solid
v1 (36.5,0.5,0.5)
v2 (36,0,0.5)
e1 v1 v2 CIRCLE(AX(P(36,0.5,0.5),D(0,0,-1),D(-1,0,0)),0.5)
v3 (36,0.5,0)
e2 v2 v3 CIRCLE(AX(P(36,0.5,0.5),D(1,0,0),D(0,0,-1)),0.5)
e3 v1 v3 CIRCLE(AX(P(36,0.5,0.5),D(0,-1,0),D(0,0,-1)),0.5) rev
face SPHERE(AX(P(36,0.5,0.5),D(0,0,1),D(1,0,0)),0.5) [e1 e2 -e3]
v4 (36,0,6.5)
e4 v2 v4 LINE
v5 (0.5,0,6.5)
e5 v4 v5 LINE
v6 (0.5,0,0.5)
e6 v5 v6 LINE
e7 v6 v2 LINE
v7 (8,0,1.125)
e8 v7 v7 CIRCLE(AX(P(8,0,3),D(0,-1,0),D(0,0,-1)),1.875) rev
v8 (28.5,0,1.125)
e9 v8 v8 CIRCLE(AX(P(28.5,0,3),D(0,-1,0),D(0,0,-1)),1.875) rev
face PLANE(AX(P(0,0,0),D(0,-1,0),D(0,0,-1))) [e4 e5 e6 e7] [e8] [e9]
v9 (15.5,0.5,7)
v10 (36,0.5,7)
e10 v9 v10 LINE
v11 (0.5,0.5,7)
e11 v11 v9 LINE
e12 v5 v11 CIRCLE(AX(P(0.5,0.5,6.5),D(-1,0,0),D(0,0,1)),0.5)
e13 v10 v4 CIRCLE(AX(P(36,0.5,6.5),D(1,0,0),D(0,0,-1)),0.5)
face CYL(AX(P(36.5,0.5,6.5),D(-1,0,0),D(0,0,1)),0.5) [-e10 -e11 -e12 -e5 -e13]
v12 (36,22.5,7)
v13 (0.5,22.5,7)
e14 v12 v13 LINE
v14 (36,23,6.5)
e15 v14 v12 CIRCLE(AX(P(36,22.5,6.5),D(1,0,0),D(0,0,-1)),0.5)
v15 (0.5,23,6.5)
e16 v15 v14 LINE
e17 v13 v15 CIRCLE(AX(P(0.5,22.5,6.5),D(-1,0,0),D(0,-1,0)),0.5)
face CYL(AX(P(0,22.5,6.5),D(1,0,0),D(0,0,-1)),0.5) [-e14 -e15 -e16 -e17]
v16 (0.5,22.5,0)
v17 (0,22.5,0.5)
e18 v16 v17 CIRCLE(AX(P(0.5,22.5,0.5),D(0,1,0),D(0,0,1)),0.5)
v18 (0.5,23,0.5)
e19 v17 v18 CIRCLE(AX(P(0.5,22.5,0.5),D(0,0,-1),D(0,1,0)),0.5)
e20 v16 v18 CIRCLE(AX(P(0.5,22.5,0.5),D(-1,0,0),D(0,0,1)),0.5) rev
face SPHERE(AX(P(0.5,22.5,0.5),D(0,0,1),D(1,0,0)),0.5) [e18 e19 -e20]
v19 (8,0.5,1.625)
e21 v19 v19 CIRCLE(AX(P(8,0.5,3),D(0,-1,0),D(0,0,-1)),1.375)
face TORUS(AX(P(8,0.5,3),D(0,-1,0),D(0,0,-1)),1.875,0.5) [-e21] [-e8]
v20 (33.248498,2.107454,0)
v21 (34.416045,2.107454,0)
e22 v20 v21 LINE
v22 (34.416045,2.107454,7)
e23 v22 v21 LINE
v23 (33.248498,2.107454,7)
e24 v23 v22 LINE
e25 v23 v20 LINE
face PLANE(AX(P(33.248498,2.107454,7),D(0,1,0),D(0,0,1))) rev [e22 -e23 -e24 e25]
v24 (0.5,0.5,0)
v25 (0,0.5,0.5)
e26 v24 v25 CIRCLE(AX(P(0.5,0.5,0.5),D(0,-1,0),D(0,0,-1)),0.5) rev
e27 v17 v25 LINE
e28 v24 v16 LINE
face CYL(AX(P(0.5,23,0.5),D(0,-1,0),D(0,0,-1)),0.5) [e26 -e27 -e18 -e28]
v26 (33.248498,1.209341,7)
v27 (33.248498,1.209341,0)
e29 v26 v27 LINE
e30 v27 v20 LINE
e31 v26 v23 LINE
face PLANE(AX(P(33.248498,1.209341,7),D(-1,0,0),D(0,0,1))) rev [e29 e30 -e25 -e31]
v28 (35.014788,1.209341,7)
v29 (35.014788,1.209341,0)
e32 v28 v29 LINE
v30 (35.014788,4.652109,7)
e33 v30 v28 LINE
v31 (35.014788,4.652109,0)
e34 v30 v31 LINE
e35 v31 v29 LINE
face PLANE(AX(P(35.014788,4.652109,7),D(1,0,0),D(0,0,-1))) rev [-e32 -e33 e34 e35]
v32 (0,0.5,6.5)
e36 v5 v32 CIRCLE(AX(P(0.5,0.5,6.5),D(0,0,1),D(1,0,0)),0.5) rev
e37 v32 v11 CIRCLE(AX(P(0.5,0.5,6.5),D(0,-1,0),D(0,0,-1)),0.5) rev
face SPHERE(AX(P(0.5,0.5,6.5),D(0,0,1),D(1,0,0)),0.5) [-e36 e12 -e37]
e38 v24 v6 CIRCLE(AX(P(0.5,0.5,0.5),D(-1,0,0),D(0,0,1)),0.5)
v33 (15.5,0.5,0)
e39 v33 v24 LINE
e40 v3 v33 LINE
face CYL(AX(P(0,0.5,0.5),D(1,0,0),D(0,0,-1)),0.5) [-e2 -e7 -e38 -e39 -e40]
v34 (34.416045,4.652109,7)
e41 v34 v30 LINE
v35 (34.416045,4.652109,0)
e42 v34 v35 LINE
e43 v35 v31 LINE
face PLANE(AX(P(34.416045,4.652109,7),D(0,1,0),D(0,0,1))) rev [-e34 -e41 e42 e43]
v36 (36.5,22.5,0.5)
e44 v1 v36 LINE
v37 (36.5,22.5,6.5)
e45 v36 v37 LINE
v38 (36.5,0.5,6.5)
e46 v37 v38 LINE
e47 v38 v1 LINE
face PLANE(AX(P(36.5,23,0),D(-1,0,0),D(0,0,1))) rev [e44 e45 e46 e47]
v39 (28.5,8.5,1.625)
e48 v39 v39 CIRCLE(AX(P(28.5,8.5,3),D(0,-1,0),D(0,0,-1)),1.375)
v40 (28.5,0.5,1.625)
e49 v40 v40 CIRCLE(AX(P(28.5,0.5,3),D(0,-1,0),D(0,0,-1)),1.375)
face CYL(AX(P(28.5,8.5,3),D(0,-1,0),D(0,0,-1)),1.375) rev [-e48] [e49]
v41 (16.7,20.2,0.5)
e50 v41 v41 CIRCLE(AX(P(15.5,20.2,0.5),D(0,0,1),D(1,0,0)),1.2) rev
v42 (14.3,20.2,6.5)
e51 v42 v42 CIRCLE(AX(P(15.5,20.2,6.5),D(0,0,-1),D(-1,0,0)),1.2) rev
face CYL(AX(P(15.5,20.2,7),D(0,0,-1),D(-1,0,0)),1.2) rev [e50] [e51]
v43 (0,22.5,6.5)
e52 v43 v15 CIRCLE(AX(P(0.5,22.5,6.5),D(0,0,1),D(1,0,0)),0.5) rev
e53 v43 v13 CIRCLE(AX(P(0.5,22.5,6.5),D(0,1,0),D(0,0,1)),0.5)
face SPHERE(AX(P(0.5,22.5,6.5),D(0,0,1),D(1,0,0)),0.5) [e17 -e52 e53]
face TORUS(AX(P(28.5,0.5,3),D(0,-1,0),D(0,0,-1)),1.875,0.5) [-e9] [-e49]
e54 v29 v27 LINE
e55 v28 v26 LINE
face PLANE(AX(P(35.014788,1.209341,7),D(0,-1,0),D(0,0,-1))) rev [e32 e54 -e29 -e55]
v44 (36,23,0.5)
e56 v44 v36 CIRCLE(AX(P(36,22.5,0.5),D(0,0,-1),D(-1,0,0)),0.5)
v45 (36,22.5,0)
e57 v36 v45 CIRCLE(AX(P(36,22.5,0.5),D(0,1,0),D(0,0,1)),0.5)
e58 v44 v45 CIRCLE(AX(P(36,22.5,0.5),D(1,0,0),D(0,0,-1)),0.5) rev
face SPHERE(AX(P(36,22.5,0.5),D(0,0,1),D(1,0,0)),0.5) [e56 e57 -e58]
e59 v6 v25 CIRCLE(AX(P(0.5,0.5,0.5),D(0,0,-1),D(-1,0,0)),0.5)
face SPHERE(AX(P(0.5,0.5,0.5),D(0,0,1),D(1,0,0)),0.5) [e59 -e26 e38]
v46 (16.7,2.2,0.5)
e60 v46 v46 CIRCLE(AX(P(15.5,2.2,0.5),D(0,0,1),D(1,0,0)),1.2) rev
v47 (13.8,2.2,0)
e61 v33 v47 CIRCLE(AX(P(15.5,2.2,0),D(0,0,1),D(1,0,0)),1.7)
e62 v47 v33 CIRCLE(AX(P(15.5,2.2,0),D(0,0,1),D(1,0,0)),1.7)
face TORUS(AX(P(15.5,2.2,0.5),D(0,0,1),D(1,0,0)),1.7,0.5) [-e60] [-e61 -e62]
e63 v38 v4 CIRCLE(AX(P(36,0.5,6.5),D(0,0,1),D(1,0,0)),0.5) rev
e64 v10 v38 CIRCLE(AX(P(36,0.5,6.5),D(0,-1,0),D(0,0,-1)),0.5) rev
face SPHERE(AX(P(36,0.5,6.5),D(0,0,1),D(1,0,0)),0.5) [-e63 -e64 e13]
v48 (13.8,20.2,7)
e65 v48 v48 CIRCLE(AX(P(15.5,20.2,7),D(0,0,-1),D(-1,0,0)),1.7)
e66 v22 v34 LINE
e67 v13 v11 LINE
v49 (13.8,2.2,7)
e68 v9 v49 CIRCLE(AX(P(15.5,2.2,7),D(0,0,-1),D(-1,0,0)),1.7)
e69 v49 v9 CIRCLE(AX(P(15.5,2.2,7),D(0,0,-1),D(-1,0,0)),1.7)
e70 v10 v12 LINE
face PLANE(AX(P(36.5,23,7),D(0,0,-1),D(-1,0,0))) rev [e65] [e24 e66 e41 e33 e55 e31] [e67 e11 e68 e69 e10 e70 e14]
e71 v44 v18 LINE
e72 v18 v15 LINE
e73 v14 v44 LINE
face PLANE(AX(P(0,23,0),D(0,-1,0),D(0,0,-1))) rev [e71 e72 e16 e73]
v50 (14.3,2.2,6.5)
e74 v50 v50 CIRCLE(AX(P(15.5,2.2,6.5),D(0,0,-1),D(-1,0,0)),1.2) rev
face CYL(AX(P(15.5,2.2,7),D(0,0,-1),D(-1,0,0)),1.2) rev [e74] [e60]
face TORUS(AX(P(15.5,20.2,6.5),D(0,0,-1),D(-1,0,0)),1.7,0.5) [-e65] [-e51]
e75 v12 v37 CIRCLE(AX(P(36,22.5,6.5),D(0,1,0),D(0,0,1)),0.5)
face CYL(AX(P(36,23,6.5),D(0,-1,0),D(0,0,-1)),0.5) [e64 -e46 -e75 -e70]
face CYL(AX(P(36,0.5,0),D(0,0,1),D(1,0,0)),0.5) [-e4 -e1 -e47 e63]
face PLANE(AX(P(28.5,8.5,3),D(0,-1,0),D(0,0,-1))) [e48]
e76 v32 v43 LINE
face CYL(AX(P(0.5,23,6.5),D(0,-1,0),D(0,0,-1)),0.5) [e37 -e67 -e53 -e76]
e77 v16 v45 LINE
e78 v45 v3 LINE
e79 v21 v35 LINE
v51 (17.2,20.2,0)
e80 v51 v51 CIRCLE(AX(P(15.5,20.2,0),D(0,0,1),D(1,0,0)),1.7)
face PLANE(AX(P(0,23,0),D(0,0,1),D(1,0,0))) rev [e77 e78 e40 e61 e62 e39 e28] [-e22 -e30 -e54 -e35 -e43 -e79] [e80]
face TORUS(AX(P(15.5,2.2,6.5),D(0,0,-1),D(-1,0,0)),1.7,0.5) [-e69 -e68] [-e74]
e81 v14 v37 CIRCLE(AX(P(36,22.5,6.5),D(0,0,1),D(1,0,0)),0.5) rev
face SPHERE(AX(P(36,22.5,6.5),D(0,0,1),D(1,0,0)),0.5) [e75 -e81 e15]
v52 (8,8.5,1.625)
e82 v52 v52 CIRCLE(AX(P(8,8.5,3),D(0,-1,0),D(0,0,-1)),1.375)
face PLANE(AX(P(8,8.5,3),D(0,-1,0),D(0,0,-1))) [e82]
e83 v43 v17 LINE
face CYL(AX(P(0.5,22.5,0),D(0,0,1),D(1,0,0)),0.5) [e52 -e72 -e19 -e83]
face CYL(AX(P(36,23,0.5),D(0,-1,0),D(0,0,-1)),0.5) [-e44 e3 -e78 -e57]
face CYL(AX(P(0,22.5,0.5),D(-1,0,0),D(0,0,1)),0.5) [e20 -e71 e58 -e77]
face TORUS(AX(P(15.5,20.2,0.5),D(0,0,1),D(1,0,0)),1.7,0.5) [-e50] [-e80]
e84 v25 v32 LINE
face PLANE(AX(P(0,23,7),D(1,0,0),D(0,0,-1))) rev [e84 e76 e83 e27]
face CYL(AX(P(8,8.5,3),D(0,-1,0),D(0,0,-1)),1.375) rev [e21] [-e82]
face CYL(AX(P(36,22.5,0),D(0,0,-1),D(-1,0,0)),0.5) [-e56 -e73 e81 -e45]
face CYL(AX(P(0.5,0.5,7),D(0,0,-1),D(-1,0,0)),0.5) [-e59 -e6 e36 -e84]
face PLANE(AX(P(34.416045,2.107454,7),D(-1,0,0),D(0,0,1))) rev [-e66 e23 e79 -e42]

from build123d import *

# Parameters (mm, degrees)
SKETCH1_W           = 36.5
SKETCH1_H           = 7
BOSS_EXTRUDE1_DEPTH = 23
SKETCH2_R           = 1.375
CUT_EXTRUDE1_DEPTH  = 8.5
SKETCH4_R           = 1.2
CUT_EXTRUDE2_DEPTH  = 7
FILLET1_R           = 0.5
CUT_EXTRUDE3_DEPTH  = 44.706406853


with BuildPart() as part:
    # Sketch1 → Boss-Extrude1 (new body)
    with BuildSketch(Plane(origin=(0, 0, 0), x_dir=(1, 0, 0), z_dir=(0, 1, 0))):
        with Locations((18.25, -3.5)):
            Rectangle(SKETCH1_W, SKETCH1_H)
    extrude(amount=BOSS_EXTRUDE1_DEPTH)

    # Sketch2 → Cut-Extrude1 (cut)
    with BuildSketch(Plane.XZ):
        with Locations(Location((8, 3, 0), (0, 0, 270))):
            Circle(SKETCH2_R)
        with Locations(Location((28.5, 3, 0), (0, 0, 270))):
            Circle(SKETCH2_R)
    extrude(amount=-CUT_EXTRUDE1_DEPTH, mode=Mode.SUBTRACT)

    # Sketch4 → Cut-Extrude2 (cut)
    with BuildSketch(Plane(origin=(0, 0, 0), x_dir=(-1, 0, 0), z_dir=(0, 0, -1))):
        with Locations((-15.5, 2.2)):
            Circle(SKETCH4_R)
        with Locations((-15.5, 20.2)):
            Circle(SKETCH4_R)
    extrude(amount=-CUT_EXTRUDE2_DEPTH, mode=Mode.SUBTRACT)

    # Fillet1
    fillet1_edges = [part.edges().sort_by_distance(p)[0] for p in [
        (36.5, 23, 3.5),
        (8, 0, 4.375),
        (18.25, 23, 0),
        (28.5, 0, 4.375),
        (16.7, 2.2, 7),
        (16.7, 2.2, 0),
        (16.7, 20.2, 7),
        (16.7, 20.2, 0),
        (0, 23, 3.5),
        (18.25, 0, 0),
        (36.5, 0, 3.5),
        (18.25, 0, 7),
        (0, 0, 3.5),
        (0, 11.5, 0),
        (36.5, 11.5, 0),
        (36.5, 11.5, 7),
        (0, 11.5, 7),
        (18.25, 23, 7),
    ]]
    fillet(fillet1_edges, radius=FILLET1_R - 0.0001)  # a hair under: the kernel refuses the full size

    # Sketch5 → Cut-Extrude3 (cut, through all)
    with BuildSketch(Plane(origin=(0, 0, 0), x_dir=(-1, 0, 0), z_dir=(0, 0, -1))):
        Polygon((-35.01478763, 4.65210946), (-35.01478763, 1.209340572), (-33.248497505, 1.209340572), (-33.248497505, 2.107454195), (-34.416045215, 2.107454195), (-34.416045215, 4.65210946), align=None)
    extrude(amount=-CUT_EXTRUDE3_DEPTH, mode=Mode.SUBTRACT)


solid = part.part
